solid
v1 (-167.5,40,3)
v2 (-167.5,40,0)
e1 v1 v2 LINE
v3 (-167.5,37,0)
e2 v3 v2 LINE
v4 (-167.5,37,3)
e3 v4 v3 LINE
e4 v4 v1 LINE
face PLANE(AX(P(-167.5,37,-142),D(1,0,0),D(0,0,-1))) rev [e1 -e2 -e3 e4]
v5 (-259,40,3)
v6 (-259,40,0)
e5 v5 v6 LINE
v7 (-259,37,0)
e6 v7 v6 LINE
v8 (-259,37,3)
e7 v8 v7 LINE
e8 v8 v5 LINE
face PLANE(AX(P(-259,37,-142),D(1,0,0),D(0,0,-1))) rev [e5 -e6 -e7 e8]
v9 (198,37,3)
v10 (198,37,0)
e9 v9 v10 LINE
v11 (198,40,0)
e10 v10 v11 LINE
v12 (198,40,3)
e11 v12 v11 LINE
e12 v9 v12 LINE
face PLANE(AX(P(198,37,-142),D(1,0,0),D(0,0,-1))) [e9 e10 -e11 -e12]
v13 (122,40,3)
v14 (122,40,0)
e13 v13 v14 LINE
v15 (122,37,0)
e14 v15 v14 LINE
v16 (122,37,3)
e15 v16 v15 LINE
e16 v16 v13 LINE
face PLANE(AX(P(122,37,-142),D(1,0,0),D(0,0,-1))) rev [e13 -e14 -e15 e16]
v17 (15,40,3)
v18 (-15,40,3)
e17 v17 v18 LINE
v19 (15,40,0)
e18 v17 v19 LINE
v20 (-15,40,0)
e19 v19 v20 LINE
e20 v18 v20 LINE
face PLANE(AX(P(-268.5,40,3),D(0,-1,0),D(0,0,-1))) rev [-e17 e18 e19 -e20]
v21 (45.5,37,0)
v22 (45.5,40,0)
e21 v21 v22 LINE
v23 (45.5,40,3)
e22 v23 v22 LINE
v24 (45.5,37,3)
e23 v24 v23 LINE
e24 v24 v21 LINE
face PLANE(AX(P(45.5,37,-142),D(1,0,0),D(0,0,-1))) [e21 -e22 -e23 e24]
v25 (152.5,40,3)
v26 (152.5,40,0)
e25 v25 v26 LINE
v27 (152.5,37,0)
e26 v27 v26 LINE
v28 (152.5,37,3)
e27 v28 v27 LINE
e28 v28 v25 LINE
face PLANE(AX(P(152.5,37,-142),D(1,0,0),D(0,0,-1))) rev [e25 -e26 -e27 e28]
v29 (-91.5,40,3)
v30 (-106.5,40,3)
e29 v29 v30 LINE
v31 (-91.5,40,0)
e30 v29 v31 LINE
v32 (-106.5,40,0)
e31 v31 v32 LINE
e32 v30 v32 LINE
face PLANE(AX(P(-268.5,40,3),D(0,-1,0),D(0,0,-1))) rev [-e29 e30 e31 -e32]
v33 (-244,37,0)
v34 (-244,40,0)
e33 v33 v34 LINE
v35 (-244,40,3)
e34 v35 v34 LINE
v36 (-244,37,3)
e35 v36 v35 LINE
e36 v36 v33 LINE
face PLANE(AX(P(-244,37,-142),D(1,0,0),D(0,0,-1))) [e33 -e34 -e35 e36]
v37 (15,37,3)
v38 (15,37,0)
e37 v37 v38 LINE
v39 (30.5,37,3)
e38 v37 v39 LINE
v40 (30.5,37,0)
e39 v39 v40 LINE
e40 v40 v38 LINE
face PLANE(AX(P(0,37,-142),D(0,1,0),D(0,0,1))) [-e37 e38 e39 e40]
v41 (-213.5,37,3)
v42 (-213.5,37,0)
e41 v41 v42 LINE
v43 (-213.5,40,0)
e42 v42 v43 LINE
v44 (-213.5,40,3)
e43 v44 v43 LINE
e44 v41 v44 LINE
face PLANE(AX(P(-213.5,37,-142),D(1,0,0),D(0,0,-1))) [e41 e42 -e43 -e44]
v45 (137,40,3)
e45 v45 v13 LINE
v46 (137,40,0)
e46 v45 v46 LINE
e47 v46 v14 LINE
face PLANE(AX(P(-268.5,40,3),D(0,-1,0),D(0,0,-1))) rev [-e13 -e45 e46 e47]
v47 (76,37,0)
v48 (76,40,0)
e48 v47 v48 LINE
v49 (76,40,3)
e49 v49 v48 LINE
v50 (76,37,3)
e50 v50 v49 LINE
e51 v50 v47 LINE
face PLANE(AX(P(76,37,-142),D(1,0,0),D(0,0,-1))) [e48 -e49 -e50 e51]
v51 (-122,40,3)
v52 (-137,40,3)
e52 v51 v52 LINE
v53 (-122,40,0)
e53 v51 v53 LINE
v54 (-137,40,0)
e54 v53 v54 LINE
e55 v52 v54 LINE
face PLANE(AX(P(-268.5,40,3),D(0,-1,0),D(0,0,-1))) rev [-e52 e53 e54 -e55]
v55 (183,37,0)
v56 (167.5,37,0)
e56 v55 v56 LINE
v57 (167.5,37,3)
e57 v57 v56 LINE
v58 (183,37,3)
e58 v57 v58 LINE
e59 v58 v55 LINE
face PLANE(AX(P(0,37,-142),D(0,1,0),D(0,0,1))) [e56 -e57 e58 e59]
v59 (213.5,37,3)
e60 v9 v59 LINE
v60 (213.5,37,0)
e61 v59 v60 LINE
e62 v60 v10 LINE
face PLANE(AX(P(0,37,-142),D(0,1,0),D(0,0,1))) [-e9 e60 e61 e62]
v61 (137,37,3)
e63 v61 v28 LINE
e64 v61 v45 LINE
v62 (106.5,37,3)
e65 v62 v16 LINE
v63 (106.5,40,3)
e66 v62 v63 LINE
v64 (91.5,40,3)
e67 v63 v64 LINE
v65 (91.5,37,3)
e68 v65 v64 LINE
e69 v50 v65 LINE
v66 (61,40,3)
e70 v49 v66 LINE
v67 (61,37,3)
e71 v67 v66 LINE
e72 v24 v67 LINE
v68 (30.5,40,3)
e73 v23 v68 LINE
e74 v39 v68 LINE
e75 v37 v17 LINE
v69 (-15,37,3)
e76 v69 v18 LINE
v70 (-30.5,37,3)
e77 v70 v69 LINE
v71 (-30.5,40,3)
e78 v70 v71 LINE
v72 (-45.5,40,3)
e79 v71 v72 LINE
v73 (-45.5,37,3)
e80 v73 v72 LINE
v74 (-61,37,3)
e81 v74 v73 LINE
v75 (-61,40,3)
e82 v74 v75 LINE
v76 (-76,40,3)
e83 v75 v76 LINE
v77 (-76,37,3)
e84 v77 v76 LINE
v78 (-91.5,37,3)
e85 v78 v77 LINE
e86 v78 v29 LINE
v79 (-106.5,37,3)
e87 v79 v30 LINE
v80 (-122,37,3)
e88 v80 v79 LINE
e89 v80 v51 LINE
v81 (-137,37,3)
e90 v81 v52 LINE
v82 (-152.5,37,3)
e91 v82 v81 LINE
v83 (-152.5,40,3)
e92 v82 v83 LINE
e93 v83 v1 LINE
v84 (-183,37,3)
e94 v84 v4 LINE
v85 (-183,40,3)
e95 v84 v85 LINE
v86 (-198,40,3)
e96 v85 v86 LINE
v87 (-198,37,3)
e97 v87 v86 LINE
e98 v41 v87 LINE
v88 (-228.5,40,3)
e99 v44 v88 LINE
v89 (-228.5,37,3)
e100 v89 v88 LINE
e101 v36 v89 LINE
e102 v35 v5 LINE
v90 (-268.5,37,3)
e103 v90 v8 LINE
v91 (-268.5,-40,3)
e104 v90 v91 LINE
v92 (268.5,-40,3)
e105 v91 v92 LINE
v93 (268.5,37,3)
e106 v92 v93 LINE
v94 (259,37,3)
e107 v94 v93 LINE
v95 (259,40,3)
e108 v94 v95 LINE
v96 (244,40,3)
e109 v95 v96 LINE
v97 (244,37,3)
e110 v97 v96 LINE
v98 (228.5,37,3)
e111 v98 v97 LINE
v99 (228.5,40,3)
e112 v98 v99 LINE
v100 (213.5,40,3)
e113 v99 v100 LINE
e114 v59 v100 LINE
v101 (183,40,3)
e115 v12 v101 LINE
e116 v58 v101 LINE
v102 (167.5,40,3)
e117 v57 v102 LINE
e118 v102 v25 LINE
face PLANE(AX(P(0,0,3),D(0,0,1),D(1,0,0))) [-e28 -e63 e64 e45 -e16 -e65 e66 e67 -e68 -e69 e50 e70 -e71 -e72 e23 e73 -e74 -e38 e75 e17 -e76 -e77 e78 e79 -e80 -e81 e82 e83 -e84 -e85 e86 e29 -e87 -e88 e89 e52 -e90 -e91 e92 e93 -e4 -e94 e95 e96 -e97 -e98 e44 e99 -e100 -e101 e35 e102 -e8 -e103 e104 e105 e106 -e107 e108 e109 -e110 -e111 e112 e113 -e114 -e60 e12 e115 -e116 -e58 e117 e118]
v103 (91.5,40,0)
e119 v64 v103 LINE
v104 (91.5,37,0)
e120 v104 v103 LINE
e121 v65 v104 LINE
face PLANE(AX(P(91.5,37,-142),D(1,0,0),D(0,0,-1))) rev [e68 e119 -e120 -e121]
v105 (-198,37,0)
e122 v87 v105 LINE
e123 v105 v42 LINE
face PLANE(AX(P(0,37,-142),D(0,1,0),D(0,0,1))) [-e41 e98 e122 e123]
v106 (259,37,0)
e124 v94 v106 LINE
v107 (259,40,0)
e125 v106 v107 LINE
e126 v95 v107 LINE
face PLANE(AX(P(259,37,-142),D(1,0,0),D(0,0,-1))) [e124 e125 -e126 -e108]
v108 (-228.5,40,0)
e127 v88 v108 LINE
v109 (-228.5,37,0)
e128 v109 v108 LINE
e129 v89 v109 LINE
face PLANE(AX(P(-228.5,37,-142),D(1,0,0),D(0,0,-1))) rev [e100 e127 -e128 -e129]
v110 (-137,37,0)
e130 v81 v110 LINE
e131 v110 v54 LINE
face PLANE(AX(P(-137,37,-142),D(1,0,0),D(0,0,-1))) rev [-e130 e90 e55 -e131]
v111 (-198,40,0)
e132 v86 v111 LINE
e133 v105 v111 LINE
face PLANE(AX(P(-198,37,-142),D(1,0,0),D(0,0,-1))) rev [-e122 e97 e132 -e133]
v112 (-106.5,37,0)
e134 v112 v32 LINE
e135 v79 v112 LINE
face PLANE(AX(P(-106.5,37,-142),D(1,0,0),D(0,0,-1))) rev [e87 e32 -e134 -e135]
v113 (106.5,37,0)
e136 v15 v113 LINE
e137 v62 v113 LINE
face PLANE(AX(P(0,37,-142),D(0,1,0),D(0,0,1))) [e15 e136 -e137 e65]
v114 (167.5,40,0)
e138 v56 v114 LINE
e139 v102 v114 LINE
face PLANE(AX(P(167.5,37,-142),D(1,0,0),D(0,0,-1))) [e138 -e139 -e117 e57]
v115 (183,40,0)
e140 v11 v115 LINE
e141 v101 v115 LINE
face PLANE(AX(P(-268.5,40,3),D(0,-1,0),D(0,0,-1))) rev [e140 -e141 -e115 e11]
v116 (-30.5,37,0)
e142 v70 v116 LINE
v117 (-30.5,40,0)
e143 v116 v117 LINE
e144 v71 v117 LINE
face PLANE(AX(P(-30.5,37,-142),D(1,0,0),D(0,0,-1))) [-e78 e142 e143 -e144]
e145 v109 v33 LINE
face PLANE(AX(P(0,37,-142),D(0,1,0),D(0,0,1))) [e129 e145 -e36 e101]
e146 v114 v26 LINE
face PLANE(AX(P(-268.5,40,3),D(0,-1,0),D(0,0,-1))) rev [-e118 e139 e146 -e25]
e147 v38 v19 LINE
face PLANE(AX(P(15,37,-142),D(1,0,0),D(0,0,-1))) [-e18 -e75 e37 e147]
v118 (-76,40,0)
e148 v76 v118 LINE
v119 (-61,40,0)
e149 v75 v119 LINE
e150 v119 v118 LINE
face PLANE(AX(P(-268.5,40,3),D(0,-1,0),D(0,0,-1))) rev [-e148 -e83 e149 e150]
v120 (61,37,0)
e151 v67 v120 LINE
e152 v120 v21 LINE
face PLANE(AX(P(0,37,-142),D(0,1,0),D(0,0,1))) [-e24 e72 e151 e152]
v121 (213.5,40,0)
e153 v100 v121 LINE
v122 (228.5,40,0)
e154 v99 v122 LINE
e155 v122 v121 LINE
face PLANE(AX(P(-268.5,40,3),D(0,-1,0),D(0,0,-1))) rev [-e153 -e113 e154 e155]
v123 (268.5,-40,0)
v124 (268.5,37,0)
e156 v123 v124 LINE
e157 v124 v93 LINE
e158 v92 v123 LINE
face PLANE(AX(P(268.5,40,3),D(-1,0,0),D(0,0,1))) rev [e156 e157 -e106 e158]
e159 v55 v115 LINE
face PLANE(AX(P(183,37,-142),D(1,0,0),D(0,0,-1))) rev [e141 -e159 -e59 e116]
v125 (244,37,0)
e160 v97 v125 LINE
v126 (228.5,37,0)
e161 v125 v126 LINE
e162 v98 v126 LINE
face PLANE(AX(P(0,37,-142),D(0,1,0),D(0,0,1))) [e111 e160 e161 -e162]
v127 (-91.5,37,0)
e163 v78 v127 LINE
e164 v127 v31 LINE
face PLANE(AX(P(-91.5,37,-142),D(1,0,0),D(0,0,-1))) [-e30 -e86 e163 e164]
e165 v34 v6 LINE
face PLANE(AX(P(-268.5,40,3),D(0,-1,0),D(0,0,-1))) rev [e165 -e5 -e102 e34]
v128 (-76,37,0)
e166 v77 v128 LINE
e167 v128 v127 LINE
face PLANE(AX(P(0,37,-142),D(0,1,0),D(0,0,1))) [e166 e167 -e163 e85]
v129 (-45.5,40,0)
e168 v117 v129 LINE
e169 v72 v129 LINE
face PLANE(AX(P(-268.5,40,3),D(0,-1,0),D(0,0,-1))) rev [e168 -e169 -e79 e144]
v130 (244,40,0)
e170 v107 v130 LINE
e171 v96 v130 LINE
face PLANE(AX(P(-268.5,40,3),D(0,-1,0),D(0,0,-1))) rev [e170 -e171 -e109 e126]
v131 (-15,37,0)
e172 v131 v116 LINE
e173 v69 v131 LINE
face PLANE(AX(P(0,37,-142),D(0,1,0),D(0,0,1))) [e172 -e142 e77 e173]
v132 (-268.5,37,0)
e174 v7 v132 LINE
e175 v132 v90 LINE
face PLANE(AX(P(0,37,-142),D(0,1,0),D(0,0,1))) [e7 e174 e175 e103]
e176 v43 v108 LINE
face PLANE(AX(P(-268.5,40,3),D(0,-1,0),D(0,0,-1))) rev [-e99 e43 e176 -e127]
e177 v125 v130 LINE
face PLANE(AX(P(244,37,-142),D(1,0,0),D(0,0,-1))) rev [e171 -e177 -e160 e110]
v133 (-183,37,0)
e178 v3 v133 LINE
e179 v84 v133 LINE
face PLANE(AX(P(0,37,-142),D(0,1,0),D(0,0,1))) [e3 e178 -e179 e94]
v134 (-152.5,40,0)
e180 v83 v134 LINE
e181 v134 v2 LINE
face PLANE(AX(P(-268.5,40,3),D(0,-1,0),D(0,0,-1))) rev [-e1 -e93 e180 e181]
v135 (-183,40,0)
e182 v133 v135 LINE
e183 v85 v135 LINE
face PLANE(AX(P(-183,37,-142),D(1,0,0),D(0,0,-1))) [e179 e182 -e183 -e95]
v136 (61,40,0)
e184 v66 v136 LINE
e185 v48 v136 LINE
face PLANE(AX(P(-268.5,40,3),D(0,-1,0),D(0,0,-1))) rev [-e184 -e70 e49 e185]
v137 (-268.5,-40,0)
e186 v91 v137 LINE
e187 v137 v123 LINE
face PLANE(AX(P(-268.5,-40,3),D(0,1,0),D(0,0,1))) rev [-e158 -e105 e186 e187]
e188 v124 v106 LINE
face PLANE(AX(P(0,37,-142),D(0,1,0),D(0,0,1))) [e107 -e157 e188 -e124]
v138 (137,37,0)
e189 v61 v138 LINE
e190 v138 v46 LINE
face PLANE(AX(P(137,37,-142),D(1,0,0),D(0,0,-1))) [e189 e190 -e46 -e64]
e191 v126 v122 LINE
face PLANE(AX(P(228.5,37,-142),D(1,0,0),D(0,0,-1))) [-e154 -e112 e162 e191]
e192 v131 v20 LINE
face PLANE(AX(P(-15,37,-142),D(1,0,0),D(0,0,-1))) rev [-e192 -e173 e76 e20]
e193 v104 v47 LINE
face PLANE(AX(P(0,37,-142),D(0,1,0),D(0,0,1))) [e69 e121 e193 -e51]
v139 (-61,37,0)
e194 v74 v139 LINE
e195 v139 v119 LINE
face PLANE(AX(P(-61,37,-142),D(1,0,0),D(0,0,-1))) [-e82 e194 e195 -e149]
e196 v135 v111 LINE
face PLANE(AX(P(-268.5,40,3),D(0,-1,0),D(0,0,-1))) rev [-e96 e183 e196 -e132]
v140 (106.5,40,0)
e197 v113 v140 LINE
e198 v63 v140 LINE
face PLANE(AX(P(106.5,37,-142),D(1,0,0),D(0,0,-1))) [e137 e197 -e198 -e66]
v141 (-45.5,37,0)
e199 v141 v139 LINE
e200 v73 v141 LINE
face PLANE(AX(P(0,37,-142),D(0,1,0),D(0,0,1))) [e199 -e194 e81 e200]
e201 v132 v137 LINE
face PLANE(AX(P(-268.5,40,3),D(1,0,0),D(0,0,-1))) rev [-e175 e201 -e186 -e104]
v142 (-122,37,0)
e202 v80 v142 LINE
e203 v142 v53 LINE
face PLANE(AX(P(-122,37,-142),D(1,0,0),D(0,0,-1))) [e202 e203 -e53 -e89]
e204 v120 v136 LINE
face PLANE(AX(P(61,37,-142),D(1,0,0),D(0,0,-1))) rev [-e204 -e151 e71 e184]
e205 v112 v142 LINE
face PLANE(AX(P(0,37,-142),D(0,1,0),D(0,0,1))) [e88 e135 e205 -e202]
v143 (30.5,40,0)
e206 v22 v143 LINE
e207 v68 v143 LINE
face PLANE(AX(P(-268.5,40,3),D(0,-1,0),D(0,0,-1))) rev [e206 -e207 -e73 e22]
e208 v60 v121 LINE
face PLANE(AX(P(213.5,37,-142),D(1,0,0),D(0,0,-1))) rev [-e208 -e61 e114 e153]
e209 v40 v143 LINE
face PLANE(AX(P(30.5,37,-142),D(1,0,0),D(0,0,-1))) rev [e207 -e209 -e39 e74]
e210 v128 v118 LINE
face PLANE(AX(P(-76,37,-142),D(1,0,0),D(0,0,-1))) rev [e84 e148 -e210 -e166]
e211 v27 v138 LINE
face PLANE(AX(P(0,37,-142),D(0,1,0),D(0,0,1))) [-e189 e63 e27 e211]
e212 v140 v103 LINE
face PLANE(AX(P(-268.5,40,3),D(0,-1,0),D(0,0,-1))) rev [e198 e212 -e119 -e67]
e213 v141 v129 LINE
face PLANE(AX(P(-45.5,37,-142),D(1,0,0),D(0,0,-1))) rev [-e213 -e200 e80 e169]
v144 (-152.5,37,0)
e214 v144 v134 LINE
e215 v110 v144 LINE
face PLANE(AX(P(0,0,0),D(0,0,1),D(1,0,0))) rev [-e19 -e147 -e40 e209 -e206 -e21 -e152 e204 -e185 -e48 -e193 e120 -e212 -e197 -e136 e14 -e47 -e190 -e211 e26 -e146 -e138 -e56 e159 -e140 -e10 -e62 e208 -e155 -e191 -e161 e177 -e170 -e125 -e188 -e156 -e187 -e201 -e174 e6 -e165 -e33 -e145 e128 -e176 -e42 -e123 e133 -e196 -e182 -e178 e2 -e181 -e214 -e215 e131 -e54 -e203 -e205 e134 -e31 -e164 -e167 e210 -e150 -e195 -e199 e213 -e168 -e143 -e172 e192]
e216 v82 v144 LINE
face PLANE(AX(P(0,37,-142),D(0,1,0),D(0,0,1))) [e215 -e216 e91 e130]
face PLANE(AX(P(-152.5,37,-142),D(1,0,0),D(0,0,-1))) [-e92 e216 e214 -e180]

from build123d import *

# Parameters (mm, degrees)
SKETCH1_W           = 537
SKETCH1_H           = 80
BOSS_EXTRUDE1_DEPTH = 3
CAVITY1_START       = 37
CAVITY1_OUTLINE_W   = 15.5
CAVITY1_OUTLINE_H   = 3
CAVITY1_OUTLINE_W_2 = 9.5
CAVITY1_DEPTH       = 3


# Read off the part's stored shape, not the designer's step: Cavity1
with BuildPart() as part:
    # Sketch1 → Boss-Extrude1 (new body)
    with BuildSketch(Plane.XY):
        Rectangle(SKETCH1_W, SKETCH1_H)
    extrude(amount=BOSS_EXTRUDE1_DEPTH)

    # Cavity1 outline → Cavity1 (cut)
    with BuildSketch(Plane(origin=(0, 0, 0), x_dir=(1, 0, 0), z_dir=(0, 1, 0)).offset(CAVITY1_START)):
        with Locations((-236.25, -1.5)):
            Rectangle(CAVITY1_OUTLINE_W, CAVITY1_OUTLINE_H)
        with Locations((-263.75, -1.5)):
            Rectangle(CAVITY1_OUTLINE_W_2, CAVITY1_OUTLINE_H)
        with Locations((-205.75, -1.5)):
            Rectangle(CAVITY1_OUTLINE_W, CAVITY1_OUTLINE_H)
        with Locations((-175.25, -1.5)):
            Rectangle(CAVITY1_OUTLINE_W, CAVITY1_OUTLINE_H)
        with Locations((-144.75, -1.5)):
            Rectangle(CAVITY1_OUTLINE_W, CAVITY1_OUTLINE_H)
        with Locations((-114.25, -1.5)):
            Rectangle(CAVITY1_OUTLINE_W, CAVITY1_OUTLINE_H)
        with Locations((-83.75, -1.5)):
            Rectangle(CAVITY1_OUTLINE_W, CAVITY1_OUTLINE_H)
        with Locations((-53.25, -1.5)):
            Rectangle(CAVITY1_OUTLINE_W, CAVITY1_OUTLINE_H)
        with Locations((-22.75, -1.5)):
            Rectangle(CAVITY1_OUTLINE_W, CAVITY1_OUTLINE_H)
        with Locations((22.75, -1.5)):
            Rectangle(CAVITY1_OUTLINE_W, CAVITY1_OUTLINE_H)
        with Locations((53.25, -1.5)):
            Rectangle(CAVITY1_OUTLINE_W, CAVITY1_OUTLINE_H)
        with Locations((83.75, -1.5)):
            Rectangle(CAVITY1_OUTLINE_W, CAVITY1_OUTLINE_H)
        with Locations((114.25, -1.5)):
            Rectangle(CAVITY1_OUTLINE_W, CAVITY1_OUTLINE_H)
        with Locations((144.75, -1.5)):
            Rectangle(CAVITY1_OUTLINE_W, CAVITY1_OUTLINE_H)
        with Locations((175.25, -1.5)):
            Rectangle(CAVITY1_OUTLINE_W, CAVITY1_OUTLINE_H)
        with Locations((205.75, -1.5)):
            Rectangle(CAVITY1_OUTLINE_W, CAVITY1_OUTLINE_H)
        with Locations((236.25, -1.5)):
            Rectangle(CAVITY1_OUTLINE_W, CAVITY1_OUTLINE_H)
        with Locations((263.75, -1.5)):
            Rectangle(CAVITY1_OUTLINE_W_2, CAVITY1_OUTLINE_H)
    extrude(amount=CAVITY1_DEPTH, mode=Mode.SUBTRACT)


solid = part.part
